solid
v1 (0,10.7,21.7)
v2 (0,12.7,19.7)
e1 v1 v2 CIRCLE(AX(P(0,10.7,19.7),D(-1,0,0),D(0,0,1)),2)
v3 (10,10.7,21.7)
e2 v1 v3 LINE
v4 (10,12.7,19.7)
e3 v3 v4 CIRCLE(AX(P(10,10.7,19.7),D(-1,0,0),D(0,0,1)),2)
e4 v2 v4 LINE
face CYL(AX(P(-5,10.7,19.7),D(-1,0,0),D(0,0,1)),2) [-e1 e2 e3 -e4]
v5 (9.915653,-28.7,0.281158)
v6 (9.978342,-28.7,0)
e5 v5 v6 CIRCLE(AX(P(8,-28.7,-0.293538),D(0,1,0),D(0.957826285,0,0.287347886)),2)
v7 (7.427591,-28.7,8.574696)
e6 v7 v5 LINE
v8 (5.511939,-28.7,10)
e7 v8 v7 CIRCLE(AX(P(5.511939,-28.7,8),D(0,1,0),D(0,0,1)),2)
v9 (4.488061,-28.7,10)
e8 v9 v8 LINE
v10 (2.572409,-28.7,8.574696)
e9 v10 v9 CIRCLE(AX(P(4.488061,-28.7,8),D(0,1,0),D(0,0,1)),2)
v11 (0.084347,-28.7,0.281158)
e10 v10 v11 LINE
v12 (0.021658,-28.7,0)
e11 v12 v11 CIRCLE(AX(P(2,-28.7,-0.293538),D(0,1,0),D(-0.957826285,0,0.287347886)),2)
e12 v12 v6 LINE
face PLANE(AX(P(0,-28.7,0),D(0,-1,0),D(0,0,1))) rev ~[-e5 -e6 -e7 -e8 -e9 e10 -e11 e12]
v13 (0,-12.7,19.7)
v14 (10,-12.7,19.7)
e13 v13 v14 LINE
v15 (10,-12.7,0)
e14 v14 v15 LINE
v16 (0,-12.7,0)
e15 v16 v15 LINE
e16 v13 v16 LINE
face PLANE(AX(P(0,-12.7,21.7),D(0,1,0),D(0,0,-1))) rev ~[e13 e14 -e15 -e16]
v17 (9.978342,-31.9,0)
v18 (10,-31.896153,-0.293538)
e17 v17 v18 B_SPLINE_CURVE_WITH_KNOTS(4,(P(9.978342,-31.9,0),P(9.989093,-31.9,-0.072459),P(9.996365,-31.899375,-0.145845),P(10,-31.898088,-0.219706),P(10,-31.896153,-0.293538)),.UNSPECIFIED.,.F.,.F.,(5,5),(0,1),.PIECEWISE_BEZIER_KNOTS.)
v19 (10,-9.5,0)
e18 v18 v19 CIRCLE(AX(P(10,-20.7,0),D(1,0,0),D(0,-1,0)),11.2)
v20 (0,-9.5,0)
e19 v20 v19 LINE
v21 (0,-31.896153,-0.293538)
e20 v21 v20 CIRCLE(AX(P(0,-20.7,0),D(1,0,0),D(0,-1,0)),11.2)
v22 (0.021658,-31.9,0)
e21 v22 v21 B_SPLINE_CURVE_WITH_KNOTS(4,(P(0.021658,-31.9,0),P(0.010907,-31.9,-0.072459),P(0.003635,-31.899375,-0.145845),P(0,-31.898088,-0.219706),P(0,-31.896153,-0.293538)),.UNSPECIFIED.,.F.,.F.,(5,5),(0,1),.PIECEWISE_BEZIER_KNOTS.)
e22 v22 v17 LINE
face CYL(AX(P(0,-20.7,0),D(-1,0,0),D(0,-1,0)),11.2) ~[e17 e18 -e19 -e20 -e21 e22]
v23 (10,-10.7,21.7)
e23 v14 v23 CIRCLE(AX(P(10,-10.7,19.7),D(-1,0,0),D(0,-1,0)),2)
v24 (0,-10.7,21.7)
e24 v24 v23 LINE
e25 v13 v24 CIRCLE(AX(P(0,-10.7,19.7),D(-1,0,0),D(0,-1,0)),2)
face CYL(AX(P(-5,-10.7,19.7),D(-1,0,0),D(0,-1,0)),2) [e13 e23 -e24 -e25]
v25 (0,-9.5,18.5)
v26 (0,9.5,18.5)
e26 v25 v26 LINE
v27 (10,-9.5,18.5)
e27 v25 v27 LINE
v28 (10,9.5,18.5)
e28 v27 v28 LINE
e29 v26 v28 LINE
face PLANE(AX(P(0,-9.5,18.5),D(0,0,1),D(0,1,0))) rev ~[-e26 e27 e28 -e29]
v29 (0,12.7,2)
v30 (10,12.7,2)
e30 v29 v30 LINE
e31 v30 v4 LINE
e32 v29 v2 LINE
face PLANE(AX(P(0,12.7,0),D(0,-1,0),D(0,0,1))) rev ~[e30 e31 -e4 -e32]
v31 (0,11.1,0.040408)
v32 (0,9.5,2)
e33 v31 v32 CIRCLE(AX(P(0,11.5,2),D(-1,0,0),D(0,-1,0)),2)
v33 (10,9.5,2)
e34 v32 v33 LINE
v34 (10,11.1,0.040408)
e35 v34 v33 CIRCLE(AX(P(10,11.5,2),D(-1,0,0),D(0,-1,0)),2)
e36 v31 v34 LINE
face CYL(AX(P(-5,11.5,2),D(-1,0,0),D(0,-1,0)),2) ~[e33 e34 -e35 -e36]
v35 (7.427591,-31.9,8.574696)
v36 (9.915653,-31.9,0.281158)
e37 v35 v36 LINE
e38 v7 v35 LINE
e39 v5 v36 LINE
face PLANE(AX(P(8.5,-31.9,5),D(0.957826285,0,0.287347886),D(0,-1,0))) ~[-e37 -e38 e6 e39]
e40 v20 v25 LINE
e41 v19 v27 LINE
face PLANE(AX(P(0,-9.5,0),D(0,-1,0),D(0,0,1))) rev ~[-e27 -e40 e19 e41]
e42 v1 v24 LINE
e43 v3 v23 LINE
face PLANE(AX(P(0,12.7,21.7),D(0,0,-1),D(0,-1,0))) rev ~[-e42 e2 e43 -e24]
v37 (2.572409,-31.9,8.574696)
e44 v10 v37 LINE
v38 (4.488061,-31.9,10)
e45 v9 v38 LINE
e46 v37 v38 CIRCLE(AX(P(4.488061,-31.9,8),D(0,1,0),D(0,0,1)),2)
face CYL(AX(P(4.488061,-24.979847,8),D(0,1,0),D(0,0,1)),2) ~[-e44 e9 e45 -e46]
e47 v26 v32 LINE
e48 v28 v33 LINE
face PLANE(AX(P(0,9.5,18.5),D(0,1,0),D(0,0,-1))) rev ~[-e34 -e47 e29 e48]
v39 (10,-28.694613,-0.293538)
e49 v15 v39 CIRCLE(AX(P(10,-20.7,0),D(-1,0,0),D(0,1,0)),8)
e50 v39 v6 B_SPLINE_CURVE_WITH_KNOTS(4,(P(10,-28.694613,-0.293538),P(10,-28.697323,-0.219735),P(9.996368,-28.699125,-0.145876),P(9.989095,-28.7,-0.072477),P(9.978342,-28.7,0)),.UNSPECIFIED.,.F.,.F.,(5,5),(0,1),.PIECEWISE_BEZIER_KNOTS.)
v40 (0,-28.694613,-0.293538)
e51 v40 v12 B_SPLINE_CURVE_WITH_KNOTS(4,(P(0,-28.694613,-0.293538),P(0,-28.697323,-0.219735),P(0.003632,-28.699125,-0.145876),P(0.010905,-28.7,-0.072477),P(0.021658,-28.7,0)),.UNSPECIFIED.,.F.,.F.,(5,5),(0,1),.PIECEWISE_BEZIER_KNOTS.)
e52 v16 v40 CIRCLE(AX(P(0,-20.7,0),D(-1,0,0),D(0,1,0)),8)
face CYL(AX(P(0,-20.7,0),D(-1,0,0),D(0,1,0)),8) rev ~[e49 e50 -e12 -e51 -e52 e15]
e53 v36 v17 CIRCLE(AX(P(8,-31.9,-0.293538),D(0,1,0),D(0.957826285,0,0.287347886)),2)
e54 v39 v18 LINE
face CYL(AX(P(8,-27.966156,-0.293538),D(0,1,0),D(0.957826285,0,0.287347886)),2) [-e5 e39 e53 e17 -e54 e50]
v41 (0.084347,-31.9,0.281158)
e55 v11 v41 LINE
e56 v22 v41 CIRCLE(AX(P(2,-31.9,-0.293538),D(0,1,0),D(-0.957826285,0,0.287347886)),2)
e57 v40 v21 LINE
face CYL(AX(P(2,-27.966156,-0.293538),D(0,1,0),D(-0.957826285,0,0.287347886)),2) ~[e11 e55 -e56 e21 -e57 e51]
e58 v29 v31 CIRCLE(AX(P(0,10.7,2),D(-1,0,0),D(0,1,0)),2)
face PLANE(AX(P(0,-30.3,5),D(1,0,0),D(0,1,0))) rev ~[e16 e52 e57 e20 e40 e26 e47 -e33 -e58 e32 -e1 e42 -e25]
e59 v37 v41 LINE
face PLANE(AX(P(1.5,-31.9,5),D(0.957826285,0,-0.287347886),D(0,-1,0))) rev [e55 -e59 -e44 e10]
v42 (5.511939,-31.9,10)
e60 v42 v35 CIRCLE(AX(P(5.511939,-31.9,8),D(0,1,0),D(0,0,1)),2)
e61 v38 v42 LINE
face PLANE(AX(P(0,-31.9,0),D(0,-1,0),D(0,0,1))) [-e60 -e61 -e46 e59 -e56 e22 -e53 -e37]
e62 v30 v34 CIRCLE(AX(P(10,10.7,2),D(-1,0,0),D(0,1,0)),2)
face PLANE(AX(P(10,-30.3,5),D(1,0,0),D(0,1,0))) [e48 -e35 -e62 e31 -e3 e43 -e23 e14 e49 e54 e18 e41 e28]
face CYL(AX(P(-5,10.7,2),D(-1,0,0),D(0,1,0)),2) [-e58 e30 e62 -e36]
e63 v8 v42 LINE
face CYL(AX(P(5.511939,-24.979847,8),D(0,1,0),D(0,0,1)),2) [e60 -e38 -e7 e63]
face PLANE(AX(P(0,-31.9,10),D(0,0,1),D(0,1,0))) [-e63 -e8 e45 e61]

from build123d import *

# Parameters (mm, degrees)
F0_W        = 3.2
F0_H        = 10
F1_DEPTH    = 10
F2_SIZE2    = 10
F2_SIZE     = 3
F3_T1_DEPTH = 10.6403065089
F3_T3_DEPTH = 4.667688363
F3_T5_DEPTH = 20


# Not quite as in the source:
# - a fillet or chamfer that OpenCascade refuses, or shapes differently, is made with other operations: its cross-section is extruded or revolved along the edge and cut away or added


with BuildPart() as f1:
    # F0 (on Right) → F1 (new body)
    with BuildSketch(Plane.YZ):
        with Locations((-30.3, 5)):
            Rectangle(F0_W, F0_H)
        with BuildLine():
            Line((-9.5, 0), (-12.7, 0))
            ThreePointArc((-12.7, 0), (-20.7, -8), (-28.7, 0))
            Line((-28.7, 0), (-31.9, 0))
            ThreePointArc((-31.9, 0), (-20.7, -11.2), (-9.5, 0))
        make_face()
        Polygon((-12.7, 21.7), (-12.7, 0), (-9.5, 0), (-9.5, 18.5), (9.5, 18.5), (9.5, 0), (12.7, 0), (12.7, 21.7), align=None)
    extrude(amount=F1_DEPTH)

    # F2
    f2_edges = [f1.edges().sort_by_distance(p)[0] for p in [
        (10, -30.3, 10),
        (0, -30.3, 10),
    ]]
    f2_side = f1.faces().sort_by_distance((5, -30.3, 10))[0]
    chamfer(f2_edges, length=F2_SIZE, length2=F2_SIZE2, reference=f2_side)

    # F3: fillet of radius 2 on 8 edges, made by hand

    # F3_s2 → F3_t1 (cut)
    with BuildSketch(Plane.XZ.offset(24.9798467455)):
        with BuildLine():
            ThreePointArc((5.5119386982, 10), (6.7057997575, 9.6045858566), (7.4275912687, 8.5746957711))
            Line((7.4275912687, 8.5746957711), (7, 10))
            Line((7, 10), (5.5119386982, 10))
        make_face()
        with BuildLine():
            ThreePointArc((4.4880613018, 10), (3.2942002425, 9.6045858566), (2.5724087313, 8.5746957711))
            Line((2.5724087313, 8.5746957711), (3, 10))
            Line((3, 10), (4.4880613018, 10))
        make_face()
    extrude(amount=F3_T1_DEPTH, mode=Mode.SUBTRACT)

    # F3_s4 → F3_t3 (cut)
    with BuildSketch(Plane.XZ.offset(27.9661558185)):
        with BuildLine():
            ThreePointArc((9.9156525704, 0.2811580985), (9.978800791, -0.0031113832), (10, -0.2935376726))
            Line((10, -0.2935376726), (10, 0))
            Line((10, 0), (9.9156525704, 0.2811580985))
        make_face()
        with BuildLine():
            ThreePointArc((0.0843474296, 0.2811580985), (0.021199209, -0.0031113832), (0, -0.2935376726))
            Line((0, -0.2935376726), (0, 0))
            Line((0, 0), (0.0843474296, 0.2811580985))
        make_face()
    extrude(amount=F3_T3_DEPTH, mode=Mode.SUBTRACT)

    # F3_s6 → F3_t5 (cut)
    with BuildSketch(Plane.YZ.offset(-5)):
        with BuildLine():
            ThreePointArc((-12.7, 19.7), (-12.1142135624, 21.1142135624), (-10.7, 21.7))
            Line((-10.7, 21.7), (-12.7, 21.7))
            Line((-12.7, 21.7), (-12.7, 19.7))
        make_face()
        with BuildLine():
            ThreePointArc((10.7, 21.7), (12.1142135624, 21.1142135624), (12.7, 19.7))
            Line((12.7, 19.7), (12.7, 21.7))
            Line((12.7, 21.7), (10.7, 21.7))
        make_face()
        with BuildLine():
            ThreePointArc((9.5, 2), (10.0857864376, 0.5857864376), (11.5, 0))
            Line((11.5, 0), (9.5, 0))
            Line((9.5, 0), (9.5, 2))
        make_face()
        with BuildLine():
            ThreePointArc((12.7, 2), (12.1142135624, 0.5857864376), (10.7, 0))
            Line((10.7, 0), (12.7, 0))
            Line((12.7, 0), (12.7, 2))
        make_face()
    extrude(amount=F3_T5_DEPTH, mode=Mode.SUBTRACT)


solid = f1.part
